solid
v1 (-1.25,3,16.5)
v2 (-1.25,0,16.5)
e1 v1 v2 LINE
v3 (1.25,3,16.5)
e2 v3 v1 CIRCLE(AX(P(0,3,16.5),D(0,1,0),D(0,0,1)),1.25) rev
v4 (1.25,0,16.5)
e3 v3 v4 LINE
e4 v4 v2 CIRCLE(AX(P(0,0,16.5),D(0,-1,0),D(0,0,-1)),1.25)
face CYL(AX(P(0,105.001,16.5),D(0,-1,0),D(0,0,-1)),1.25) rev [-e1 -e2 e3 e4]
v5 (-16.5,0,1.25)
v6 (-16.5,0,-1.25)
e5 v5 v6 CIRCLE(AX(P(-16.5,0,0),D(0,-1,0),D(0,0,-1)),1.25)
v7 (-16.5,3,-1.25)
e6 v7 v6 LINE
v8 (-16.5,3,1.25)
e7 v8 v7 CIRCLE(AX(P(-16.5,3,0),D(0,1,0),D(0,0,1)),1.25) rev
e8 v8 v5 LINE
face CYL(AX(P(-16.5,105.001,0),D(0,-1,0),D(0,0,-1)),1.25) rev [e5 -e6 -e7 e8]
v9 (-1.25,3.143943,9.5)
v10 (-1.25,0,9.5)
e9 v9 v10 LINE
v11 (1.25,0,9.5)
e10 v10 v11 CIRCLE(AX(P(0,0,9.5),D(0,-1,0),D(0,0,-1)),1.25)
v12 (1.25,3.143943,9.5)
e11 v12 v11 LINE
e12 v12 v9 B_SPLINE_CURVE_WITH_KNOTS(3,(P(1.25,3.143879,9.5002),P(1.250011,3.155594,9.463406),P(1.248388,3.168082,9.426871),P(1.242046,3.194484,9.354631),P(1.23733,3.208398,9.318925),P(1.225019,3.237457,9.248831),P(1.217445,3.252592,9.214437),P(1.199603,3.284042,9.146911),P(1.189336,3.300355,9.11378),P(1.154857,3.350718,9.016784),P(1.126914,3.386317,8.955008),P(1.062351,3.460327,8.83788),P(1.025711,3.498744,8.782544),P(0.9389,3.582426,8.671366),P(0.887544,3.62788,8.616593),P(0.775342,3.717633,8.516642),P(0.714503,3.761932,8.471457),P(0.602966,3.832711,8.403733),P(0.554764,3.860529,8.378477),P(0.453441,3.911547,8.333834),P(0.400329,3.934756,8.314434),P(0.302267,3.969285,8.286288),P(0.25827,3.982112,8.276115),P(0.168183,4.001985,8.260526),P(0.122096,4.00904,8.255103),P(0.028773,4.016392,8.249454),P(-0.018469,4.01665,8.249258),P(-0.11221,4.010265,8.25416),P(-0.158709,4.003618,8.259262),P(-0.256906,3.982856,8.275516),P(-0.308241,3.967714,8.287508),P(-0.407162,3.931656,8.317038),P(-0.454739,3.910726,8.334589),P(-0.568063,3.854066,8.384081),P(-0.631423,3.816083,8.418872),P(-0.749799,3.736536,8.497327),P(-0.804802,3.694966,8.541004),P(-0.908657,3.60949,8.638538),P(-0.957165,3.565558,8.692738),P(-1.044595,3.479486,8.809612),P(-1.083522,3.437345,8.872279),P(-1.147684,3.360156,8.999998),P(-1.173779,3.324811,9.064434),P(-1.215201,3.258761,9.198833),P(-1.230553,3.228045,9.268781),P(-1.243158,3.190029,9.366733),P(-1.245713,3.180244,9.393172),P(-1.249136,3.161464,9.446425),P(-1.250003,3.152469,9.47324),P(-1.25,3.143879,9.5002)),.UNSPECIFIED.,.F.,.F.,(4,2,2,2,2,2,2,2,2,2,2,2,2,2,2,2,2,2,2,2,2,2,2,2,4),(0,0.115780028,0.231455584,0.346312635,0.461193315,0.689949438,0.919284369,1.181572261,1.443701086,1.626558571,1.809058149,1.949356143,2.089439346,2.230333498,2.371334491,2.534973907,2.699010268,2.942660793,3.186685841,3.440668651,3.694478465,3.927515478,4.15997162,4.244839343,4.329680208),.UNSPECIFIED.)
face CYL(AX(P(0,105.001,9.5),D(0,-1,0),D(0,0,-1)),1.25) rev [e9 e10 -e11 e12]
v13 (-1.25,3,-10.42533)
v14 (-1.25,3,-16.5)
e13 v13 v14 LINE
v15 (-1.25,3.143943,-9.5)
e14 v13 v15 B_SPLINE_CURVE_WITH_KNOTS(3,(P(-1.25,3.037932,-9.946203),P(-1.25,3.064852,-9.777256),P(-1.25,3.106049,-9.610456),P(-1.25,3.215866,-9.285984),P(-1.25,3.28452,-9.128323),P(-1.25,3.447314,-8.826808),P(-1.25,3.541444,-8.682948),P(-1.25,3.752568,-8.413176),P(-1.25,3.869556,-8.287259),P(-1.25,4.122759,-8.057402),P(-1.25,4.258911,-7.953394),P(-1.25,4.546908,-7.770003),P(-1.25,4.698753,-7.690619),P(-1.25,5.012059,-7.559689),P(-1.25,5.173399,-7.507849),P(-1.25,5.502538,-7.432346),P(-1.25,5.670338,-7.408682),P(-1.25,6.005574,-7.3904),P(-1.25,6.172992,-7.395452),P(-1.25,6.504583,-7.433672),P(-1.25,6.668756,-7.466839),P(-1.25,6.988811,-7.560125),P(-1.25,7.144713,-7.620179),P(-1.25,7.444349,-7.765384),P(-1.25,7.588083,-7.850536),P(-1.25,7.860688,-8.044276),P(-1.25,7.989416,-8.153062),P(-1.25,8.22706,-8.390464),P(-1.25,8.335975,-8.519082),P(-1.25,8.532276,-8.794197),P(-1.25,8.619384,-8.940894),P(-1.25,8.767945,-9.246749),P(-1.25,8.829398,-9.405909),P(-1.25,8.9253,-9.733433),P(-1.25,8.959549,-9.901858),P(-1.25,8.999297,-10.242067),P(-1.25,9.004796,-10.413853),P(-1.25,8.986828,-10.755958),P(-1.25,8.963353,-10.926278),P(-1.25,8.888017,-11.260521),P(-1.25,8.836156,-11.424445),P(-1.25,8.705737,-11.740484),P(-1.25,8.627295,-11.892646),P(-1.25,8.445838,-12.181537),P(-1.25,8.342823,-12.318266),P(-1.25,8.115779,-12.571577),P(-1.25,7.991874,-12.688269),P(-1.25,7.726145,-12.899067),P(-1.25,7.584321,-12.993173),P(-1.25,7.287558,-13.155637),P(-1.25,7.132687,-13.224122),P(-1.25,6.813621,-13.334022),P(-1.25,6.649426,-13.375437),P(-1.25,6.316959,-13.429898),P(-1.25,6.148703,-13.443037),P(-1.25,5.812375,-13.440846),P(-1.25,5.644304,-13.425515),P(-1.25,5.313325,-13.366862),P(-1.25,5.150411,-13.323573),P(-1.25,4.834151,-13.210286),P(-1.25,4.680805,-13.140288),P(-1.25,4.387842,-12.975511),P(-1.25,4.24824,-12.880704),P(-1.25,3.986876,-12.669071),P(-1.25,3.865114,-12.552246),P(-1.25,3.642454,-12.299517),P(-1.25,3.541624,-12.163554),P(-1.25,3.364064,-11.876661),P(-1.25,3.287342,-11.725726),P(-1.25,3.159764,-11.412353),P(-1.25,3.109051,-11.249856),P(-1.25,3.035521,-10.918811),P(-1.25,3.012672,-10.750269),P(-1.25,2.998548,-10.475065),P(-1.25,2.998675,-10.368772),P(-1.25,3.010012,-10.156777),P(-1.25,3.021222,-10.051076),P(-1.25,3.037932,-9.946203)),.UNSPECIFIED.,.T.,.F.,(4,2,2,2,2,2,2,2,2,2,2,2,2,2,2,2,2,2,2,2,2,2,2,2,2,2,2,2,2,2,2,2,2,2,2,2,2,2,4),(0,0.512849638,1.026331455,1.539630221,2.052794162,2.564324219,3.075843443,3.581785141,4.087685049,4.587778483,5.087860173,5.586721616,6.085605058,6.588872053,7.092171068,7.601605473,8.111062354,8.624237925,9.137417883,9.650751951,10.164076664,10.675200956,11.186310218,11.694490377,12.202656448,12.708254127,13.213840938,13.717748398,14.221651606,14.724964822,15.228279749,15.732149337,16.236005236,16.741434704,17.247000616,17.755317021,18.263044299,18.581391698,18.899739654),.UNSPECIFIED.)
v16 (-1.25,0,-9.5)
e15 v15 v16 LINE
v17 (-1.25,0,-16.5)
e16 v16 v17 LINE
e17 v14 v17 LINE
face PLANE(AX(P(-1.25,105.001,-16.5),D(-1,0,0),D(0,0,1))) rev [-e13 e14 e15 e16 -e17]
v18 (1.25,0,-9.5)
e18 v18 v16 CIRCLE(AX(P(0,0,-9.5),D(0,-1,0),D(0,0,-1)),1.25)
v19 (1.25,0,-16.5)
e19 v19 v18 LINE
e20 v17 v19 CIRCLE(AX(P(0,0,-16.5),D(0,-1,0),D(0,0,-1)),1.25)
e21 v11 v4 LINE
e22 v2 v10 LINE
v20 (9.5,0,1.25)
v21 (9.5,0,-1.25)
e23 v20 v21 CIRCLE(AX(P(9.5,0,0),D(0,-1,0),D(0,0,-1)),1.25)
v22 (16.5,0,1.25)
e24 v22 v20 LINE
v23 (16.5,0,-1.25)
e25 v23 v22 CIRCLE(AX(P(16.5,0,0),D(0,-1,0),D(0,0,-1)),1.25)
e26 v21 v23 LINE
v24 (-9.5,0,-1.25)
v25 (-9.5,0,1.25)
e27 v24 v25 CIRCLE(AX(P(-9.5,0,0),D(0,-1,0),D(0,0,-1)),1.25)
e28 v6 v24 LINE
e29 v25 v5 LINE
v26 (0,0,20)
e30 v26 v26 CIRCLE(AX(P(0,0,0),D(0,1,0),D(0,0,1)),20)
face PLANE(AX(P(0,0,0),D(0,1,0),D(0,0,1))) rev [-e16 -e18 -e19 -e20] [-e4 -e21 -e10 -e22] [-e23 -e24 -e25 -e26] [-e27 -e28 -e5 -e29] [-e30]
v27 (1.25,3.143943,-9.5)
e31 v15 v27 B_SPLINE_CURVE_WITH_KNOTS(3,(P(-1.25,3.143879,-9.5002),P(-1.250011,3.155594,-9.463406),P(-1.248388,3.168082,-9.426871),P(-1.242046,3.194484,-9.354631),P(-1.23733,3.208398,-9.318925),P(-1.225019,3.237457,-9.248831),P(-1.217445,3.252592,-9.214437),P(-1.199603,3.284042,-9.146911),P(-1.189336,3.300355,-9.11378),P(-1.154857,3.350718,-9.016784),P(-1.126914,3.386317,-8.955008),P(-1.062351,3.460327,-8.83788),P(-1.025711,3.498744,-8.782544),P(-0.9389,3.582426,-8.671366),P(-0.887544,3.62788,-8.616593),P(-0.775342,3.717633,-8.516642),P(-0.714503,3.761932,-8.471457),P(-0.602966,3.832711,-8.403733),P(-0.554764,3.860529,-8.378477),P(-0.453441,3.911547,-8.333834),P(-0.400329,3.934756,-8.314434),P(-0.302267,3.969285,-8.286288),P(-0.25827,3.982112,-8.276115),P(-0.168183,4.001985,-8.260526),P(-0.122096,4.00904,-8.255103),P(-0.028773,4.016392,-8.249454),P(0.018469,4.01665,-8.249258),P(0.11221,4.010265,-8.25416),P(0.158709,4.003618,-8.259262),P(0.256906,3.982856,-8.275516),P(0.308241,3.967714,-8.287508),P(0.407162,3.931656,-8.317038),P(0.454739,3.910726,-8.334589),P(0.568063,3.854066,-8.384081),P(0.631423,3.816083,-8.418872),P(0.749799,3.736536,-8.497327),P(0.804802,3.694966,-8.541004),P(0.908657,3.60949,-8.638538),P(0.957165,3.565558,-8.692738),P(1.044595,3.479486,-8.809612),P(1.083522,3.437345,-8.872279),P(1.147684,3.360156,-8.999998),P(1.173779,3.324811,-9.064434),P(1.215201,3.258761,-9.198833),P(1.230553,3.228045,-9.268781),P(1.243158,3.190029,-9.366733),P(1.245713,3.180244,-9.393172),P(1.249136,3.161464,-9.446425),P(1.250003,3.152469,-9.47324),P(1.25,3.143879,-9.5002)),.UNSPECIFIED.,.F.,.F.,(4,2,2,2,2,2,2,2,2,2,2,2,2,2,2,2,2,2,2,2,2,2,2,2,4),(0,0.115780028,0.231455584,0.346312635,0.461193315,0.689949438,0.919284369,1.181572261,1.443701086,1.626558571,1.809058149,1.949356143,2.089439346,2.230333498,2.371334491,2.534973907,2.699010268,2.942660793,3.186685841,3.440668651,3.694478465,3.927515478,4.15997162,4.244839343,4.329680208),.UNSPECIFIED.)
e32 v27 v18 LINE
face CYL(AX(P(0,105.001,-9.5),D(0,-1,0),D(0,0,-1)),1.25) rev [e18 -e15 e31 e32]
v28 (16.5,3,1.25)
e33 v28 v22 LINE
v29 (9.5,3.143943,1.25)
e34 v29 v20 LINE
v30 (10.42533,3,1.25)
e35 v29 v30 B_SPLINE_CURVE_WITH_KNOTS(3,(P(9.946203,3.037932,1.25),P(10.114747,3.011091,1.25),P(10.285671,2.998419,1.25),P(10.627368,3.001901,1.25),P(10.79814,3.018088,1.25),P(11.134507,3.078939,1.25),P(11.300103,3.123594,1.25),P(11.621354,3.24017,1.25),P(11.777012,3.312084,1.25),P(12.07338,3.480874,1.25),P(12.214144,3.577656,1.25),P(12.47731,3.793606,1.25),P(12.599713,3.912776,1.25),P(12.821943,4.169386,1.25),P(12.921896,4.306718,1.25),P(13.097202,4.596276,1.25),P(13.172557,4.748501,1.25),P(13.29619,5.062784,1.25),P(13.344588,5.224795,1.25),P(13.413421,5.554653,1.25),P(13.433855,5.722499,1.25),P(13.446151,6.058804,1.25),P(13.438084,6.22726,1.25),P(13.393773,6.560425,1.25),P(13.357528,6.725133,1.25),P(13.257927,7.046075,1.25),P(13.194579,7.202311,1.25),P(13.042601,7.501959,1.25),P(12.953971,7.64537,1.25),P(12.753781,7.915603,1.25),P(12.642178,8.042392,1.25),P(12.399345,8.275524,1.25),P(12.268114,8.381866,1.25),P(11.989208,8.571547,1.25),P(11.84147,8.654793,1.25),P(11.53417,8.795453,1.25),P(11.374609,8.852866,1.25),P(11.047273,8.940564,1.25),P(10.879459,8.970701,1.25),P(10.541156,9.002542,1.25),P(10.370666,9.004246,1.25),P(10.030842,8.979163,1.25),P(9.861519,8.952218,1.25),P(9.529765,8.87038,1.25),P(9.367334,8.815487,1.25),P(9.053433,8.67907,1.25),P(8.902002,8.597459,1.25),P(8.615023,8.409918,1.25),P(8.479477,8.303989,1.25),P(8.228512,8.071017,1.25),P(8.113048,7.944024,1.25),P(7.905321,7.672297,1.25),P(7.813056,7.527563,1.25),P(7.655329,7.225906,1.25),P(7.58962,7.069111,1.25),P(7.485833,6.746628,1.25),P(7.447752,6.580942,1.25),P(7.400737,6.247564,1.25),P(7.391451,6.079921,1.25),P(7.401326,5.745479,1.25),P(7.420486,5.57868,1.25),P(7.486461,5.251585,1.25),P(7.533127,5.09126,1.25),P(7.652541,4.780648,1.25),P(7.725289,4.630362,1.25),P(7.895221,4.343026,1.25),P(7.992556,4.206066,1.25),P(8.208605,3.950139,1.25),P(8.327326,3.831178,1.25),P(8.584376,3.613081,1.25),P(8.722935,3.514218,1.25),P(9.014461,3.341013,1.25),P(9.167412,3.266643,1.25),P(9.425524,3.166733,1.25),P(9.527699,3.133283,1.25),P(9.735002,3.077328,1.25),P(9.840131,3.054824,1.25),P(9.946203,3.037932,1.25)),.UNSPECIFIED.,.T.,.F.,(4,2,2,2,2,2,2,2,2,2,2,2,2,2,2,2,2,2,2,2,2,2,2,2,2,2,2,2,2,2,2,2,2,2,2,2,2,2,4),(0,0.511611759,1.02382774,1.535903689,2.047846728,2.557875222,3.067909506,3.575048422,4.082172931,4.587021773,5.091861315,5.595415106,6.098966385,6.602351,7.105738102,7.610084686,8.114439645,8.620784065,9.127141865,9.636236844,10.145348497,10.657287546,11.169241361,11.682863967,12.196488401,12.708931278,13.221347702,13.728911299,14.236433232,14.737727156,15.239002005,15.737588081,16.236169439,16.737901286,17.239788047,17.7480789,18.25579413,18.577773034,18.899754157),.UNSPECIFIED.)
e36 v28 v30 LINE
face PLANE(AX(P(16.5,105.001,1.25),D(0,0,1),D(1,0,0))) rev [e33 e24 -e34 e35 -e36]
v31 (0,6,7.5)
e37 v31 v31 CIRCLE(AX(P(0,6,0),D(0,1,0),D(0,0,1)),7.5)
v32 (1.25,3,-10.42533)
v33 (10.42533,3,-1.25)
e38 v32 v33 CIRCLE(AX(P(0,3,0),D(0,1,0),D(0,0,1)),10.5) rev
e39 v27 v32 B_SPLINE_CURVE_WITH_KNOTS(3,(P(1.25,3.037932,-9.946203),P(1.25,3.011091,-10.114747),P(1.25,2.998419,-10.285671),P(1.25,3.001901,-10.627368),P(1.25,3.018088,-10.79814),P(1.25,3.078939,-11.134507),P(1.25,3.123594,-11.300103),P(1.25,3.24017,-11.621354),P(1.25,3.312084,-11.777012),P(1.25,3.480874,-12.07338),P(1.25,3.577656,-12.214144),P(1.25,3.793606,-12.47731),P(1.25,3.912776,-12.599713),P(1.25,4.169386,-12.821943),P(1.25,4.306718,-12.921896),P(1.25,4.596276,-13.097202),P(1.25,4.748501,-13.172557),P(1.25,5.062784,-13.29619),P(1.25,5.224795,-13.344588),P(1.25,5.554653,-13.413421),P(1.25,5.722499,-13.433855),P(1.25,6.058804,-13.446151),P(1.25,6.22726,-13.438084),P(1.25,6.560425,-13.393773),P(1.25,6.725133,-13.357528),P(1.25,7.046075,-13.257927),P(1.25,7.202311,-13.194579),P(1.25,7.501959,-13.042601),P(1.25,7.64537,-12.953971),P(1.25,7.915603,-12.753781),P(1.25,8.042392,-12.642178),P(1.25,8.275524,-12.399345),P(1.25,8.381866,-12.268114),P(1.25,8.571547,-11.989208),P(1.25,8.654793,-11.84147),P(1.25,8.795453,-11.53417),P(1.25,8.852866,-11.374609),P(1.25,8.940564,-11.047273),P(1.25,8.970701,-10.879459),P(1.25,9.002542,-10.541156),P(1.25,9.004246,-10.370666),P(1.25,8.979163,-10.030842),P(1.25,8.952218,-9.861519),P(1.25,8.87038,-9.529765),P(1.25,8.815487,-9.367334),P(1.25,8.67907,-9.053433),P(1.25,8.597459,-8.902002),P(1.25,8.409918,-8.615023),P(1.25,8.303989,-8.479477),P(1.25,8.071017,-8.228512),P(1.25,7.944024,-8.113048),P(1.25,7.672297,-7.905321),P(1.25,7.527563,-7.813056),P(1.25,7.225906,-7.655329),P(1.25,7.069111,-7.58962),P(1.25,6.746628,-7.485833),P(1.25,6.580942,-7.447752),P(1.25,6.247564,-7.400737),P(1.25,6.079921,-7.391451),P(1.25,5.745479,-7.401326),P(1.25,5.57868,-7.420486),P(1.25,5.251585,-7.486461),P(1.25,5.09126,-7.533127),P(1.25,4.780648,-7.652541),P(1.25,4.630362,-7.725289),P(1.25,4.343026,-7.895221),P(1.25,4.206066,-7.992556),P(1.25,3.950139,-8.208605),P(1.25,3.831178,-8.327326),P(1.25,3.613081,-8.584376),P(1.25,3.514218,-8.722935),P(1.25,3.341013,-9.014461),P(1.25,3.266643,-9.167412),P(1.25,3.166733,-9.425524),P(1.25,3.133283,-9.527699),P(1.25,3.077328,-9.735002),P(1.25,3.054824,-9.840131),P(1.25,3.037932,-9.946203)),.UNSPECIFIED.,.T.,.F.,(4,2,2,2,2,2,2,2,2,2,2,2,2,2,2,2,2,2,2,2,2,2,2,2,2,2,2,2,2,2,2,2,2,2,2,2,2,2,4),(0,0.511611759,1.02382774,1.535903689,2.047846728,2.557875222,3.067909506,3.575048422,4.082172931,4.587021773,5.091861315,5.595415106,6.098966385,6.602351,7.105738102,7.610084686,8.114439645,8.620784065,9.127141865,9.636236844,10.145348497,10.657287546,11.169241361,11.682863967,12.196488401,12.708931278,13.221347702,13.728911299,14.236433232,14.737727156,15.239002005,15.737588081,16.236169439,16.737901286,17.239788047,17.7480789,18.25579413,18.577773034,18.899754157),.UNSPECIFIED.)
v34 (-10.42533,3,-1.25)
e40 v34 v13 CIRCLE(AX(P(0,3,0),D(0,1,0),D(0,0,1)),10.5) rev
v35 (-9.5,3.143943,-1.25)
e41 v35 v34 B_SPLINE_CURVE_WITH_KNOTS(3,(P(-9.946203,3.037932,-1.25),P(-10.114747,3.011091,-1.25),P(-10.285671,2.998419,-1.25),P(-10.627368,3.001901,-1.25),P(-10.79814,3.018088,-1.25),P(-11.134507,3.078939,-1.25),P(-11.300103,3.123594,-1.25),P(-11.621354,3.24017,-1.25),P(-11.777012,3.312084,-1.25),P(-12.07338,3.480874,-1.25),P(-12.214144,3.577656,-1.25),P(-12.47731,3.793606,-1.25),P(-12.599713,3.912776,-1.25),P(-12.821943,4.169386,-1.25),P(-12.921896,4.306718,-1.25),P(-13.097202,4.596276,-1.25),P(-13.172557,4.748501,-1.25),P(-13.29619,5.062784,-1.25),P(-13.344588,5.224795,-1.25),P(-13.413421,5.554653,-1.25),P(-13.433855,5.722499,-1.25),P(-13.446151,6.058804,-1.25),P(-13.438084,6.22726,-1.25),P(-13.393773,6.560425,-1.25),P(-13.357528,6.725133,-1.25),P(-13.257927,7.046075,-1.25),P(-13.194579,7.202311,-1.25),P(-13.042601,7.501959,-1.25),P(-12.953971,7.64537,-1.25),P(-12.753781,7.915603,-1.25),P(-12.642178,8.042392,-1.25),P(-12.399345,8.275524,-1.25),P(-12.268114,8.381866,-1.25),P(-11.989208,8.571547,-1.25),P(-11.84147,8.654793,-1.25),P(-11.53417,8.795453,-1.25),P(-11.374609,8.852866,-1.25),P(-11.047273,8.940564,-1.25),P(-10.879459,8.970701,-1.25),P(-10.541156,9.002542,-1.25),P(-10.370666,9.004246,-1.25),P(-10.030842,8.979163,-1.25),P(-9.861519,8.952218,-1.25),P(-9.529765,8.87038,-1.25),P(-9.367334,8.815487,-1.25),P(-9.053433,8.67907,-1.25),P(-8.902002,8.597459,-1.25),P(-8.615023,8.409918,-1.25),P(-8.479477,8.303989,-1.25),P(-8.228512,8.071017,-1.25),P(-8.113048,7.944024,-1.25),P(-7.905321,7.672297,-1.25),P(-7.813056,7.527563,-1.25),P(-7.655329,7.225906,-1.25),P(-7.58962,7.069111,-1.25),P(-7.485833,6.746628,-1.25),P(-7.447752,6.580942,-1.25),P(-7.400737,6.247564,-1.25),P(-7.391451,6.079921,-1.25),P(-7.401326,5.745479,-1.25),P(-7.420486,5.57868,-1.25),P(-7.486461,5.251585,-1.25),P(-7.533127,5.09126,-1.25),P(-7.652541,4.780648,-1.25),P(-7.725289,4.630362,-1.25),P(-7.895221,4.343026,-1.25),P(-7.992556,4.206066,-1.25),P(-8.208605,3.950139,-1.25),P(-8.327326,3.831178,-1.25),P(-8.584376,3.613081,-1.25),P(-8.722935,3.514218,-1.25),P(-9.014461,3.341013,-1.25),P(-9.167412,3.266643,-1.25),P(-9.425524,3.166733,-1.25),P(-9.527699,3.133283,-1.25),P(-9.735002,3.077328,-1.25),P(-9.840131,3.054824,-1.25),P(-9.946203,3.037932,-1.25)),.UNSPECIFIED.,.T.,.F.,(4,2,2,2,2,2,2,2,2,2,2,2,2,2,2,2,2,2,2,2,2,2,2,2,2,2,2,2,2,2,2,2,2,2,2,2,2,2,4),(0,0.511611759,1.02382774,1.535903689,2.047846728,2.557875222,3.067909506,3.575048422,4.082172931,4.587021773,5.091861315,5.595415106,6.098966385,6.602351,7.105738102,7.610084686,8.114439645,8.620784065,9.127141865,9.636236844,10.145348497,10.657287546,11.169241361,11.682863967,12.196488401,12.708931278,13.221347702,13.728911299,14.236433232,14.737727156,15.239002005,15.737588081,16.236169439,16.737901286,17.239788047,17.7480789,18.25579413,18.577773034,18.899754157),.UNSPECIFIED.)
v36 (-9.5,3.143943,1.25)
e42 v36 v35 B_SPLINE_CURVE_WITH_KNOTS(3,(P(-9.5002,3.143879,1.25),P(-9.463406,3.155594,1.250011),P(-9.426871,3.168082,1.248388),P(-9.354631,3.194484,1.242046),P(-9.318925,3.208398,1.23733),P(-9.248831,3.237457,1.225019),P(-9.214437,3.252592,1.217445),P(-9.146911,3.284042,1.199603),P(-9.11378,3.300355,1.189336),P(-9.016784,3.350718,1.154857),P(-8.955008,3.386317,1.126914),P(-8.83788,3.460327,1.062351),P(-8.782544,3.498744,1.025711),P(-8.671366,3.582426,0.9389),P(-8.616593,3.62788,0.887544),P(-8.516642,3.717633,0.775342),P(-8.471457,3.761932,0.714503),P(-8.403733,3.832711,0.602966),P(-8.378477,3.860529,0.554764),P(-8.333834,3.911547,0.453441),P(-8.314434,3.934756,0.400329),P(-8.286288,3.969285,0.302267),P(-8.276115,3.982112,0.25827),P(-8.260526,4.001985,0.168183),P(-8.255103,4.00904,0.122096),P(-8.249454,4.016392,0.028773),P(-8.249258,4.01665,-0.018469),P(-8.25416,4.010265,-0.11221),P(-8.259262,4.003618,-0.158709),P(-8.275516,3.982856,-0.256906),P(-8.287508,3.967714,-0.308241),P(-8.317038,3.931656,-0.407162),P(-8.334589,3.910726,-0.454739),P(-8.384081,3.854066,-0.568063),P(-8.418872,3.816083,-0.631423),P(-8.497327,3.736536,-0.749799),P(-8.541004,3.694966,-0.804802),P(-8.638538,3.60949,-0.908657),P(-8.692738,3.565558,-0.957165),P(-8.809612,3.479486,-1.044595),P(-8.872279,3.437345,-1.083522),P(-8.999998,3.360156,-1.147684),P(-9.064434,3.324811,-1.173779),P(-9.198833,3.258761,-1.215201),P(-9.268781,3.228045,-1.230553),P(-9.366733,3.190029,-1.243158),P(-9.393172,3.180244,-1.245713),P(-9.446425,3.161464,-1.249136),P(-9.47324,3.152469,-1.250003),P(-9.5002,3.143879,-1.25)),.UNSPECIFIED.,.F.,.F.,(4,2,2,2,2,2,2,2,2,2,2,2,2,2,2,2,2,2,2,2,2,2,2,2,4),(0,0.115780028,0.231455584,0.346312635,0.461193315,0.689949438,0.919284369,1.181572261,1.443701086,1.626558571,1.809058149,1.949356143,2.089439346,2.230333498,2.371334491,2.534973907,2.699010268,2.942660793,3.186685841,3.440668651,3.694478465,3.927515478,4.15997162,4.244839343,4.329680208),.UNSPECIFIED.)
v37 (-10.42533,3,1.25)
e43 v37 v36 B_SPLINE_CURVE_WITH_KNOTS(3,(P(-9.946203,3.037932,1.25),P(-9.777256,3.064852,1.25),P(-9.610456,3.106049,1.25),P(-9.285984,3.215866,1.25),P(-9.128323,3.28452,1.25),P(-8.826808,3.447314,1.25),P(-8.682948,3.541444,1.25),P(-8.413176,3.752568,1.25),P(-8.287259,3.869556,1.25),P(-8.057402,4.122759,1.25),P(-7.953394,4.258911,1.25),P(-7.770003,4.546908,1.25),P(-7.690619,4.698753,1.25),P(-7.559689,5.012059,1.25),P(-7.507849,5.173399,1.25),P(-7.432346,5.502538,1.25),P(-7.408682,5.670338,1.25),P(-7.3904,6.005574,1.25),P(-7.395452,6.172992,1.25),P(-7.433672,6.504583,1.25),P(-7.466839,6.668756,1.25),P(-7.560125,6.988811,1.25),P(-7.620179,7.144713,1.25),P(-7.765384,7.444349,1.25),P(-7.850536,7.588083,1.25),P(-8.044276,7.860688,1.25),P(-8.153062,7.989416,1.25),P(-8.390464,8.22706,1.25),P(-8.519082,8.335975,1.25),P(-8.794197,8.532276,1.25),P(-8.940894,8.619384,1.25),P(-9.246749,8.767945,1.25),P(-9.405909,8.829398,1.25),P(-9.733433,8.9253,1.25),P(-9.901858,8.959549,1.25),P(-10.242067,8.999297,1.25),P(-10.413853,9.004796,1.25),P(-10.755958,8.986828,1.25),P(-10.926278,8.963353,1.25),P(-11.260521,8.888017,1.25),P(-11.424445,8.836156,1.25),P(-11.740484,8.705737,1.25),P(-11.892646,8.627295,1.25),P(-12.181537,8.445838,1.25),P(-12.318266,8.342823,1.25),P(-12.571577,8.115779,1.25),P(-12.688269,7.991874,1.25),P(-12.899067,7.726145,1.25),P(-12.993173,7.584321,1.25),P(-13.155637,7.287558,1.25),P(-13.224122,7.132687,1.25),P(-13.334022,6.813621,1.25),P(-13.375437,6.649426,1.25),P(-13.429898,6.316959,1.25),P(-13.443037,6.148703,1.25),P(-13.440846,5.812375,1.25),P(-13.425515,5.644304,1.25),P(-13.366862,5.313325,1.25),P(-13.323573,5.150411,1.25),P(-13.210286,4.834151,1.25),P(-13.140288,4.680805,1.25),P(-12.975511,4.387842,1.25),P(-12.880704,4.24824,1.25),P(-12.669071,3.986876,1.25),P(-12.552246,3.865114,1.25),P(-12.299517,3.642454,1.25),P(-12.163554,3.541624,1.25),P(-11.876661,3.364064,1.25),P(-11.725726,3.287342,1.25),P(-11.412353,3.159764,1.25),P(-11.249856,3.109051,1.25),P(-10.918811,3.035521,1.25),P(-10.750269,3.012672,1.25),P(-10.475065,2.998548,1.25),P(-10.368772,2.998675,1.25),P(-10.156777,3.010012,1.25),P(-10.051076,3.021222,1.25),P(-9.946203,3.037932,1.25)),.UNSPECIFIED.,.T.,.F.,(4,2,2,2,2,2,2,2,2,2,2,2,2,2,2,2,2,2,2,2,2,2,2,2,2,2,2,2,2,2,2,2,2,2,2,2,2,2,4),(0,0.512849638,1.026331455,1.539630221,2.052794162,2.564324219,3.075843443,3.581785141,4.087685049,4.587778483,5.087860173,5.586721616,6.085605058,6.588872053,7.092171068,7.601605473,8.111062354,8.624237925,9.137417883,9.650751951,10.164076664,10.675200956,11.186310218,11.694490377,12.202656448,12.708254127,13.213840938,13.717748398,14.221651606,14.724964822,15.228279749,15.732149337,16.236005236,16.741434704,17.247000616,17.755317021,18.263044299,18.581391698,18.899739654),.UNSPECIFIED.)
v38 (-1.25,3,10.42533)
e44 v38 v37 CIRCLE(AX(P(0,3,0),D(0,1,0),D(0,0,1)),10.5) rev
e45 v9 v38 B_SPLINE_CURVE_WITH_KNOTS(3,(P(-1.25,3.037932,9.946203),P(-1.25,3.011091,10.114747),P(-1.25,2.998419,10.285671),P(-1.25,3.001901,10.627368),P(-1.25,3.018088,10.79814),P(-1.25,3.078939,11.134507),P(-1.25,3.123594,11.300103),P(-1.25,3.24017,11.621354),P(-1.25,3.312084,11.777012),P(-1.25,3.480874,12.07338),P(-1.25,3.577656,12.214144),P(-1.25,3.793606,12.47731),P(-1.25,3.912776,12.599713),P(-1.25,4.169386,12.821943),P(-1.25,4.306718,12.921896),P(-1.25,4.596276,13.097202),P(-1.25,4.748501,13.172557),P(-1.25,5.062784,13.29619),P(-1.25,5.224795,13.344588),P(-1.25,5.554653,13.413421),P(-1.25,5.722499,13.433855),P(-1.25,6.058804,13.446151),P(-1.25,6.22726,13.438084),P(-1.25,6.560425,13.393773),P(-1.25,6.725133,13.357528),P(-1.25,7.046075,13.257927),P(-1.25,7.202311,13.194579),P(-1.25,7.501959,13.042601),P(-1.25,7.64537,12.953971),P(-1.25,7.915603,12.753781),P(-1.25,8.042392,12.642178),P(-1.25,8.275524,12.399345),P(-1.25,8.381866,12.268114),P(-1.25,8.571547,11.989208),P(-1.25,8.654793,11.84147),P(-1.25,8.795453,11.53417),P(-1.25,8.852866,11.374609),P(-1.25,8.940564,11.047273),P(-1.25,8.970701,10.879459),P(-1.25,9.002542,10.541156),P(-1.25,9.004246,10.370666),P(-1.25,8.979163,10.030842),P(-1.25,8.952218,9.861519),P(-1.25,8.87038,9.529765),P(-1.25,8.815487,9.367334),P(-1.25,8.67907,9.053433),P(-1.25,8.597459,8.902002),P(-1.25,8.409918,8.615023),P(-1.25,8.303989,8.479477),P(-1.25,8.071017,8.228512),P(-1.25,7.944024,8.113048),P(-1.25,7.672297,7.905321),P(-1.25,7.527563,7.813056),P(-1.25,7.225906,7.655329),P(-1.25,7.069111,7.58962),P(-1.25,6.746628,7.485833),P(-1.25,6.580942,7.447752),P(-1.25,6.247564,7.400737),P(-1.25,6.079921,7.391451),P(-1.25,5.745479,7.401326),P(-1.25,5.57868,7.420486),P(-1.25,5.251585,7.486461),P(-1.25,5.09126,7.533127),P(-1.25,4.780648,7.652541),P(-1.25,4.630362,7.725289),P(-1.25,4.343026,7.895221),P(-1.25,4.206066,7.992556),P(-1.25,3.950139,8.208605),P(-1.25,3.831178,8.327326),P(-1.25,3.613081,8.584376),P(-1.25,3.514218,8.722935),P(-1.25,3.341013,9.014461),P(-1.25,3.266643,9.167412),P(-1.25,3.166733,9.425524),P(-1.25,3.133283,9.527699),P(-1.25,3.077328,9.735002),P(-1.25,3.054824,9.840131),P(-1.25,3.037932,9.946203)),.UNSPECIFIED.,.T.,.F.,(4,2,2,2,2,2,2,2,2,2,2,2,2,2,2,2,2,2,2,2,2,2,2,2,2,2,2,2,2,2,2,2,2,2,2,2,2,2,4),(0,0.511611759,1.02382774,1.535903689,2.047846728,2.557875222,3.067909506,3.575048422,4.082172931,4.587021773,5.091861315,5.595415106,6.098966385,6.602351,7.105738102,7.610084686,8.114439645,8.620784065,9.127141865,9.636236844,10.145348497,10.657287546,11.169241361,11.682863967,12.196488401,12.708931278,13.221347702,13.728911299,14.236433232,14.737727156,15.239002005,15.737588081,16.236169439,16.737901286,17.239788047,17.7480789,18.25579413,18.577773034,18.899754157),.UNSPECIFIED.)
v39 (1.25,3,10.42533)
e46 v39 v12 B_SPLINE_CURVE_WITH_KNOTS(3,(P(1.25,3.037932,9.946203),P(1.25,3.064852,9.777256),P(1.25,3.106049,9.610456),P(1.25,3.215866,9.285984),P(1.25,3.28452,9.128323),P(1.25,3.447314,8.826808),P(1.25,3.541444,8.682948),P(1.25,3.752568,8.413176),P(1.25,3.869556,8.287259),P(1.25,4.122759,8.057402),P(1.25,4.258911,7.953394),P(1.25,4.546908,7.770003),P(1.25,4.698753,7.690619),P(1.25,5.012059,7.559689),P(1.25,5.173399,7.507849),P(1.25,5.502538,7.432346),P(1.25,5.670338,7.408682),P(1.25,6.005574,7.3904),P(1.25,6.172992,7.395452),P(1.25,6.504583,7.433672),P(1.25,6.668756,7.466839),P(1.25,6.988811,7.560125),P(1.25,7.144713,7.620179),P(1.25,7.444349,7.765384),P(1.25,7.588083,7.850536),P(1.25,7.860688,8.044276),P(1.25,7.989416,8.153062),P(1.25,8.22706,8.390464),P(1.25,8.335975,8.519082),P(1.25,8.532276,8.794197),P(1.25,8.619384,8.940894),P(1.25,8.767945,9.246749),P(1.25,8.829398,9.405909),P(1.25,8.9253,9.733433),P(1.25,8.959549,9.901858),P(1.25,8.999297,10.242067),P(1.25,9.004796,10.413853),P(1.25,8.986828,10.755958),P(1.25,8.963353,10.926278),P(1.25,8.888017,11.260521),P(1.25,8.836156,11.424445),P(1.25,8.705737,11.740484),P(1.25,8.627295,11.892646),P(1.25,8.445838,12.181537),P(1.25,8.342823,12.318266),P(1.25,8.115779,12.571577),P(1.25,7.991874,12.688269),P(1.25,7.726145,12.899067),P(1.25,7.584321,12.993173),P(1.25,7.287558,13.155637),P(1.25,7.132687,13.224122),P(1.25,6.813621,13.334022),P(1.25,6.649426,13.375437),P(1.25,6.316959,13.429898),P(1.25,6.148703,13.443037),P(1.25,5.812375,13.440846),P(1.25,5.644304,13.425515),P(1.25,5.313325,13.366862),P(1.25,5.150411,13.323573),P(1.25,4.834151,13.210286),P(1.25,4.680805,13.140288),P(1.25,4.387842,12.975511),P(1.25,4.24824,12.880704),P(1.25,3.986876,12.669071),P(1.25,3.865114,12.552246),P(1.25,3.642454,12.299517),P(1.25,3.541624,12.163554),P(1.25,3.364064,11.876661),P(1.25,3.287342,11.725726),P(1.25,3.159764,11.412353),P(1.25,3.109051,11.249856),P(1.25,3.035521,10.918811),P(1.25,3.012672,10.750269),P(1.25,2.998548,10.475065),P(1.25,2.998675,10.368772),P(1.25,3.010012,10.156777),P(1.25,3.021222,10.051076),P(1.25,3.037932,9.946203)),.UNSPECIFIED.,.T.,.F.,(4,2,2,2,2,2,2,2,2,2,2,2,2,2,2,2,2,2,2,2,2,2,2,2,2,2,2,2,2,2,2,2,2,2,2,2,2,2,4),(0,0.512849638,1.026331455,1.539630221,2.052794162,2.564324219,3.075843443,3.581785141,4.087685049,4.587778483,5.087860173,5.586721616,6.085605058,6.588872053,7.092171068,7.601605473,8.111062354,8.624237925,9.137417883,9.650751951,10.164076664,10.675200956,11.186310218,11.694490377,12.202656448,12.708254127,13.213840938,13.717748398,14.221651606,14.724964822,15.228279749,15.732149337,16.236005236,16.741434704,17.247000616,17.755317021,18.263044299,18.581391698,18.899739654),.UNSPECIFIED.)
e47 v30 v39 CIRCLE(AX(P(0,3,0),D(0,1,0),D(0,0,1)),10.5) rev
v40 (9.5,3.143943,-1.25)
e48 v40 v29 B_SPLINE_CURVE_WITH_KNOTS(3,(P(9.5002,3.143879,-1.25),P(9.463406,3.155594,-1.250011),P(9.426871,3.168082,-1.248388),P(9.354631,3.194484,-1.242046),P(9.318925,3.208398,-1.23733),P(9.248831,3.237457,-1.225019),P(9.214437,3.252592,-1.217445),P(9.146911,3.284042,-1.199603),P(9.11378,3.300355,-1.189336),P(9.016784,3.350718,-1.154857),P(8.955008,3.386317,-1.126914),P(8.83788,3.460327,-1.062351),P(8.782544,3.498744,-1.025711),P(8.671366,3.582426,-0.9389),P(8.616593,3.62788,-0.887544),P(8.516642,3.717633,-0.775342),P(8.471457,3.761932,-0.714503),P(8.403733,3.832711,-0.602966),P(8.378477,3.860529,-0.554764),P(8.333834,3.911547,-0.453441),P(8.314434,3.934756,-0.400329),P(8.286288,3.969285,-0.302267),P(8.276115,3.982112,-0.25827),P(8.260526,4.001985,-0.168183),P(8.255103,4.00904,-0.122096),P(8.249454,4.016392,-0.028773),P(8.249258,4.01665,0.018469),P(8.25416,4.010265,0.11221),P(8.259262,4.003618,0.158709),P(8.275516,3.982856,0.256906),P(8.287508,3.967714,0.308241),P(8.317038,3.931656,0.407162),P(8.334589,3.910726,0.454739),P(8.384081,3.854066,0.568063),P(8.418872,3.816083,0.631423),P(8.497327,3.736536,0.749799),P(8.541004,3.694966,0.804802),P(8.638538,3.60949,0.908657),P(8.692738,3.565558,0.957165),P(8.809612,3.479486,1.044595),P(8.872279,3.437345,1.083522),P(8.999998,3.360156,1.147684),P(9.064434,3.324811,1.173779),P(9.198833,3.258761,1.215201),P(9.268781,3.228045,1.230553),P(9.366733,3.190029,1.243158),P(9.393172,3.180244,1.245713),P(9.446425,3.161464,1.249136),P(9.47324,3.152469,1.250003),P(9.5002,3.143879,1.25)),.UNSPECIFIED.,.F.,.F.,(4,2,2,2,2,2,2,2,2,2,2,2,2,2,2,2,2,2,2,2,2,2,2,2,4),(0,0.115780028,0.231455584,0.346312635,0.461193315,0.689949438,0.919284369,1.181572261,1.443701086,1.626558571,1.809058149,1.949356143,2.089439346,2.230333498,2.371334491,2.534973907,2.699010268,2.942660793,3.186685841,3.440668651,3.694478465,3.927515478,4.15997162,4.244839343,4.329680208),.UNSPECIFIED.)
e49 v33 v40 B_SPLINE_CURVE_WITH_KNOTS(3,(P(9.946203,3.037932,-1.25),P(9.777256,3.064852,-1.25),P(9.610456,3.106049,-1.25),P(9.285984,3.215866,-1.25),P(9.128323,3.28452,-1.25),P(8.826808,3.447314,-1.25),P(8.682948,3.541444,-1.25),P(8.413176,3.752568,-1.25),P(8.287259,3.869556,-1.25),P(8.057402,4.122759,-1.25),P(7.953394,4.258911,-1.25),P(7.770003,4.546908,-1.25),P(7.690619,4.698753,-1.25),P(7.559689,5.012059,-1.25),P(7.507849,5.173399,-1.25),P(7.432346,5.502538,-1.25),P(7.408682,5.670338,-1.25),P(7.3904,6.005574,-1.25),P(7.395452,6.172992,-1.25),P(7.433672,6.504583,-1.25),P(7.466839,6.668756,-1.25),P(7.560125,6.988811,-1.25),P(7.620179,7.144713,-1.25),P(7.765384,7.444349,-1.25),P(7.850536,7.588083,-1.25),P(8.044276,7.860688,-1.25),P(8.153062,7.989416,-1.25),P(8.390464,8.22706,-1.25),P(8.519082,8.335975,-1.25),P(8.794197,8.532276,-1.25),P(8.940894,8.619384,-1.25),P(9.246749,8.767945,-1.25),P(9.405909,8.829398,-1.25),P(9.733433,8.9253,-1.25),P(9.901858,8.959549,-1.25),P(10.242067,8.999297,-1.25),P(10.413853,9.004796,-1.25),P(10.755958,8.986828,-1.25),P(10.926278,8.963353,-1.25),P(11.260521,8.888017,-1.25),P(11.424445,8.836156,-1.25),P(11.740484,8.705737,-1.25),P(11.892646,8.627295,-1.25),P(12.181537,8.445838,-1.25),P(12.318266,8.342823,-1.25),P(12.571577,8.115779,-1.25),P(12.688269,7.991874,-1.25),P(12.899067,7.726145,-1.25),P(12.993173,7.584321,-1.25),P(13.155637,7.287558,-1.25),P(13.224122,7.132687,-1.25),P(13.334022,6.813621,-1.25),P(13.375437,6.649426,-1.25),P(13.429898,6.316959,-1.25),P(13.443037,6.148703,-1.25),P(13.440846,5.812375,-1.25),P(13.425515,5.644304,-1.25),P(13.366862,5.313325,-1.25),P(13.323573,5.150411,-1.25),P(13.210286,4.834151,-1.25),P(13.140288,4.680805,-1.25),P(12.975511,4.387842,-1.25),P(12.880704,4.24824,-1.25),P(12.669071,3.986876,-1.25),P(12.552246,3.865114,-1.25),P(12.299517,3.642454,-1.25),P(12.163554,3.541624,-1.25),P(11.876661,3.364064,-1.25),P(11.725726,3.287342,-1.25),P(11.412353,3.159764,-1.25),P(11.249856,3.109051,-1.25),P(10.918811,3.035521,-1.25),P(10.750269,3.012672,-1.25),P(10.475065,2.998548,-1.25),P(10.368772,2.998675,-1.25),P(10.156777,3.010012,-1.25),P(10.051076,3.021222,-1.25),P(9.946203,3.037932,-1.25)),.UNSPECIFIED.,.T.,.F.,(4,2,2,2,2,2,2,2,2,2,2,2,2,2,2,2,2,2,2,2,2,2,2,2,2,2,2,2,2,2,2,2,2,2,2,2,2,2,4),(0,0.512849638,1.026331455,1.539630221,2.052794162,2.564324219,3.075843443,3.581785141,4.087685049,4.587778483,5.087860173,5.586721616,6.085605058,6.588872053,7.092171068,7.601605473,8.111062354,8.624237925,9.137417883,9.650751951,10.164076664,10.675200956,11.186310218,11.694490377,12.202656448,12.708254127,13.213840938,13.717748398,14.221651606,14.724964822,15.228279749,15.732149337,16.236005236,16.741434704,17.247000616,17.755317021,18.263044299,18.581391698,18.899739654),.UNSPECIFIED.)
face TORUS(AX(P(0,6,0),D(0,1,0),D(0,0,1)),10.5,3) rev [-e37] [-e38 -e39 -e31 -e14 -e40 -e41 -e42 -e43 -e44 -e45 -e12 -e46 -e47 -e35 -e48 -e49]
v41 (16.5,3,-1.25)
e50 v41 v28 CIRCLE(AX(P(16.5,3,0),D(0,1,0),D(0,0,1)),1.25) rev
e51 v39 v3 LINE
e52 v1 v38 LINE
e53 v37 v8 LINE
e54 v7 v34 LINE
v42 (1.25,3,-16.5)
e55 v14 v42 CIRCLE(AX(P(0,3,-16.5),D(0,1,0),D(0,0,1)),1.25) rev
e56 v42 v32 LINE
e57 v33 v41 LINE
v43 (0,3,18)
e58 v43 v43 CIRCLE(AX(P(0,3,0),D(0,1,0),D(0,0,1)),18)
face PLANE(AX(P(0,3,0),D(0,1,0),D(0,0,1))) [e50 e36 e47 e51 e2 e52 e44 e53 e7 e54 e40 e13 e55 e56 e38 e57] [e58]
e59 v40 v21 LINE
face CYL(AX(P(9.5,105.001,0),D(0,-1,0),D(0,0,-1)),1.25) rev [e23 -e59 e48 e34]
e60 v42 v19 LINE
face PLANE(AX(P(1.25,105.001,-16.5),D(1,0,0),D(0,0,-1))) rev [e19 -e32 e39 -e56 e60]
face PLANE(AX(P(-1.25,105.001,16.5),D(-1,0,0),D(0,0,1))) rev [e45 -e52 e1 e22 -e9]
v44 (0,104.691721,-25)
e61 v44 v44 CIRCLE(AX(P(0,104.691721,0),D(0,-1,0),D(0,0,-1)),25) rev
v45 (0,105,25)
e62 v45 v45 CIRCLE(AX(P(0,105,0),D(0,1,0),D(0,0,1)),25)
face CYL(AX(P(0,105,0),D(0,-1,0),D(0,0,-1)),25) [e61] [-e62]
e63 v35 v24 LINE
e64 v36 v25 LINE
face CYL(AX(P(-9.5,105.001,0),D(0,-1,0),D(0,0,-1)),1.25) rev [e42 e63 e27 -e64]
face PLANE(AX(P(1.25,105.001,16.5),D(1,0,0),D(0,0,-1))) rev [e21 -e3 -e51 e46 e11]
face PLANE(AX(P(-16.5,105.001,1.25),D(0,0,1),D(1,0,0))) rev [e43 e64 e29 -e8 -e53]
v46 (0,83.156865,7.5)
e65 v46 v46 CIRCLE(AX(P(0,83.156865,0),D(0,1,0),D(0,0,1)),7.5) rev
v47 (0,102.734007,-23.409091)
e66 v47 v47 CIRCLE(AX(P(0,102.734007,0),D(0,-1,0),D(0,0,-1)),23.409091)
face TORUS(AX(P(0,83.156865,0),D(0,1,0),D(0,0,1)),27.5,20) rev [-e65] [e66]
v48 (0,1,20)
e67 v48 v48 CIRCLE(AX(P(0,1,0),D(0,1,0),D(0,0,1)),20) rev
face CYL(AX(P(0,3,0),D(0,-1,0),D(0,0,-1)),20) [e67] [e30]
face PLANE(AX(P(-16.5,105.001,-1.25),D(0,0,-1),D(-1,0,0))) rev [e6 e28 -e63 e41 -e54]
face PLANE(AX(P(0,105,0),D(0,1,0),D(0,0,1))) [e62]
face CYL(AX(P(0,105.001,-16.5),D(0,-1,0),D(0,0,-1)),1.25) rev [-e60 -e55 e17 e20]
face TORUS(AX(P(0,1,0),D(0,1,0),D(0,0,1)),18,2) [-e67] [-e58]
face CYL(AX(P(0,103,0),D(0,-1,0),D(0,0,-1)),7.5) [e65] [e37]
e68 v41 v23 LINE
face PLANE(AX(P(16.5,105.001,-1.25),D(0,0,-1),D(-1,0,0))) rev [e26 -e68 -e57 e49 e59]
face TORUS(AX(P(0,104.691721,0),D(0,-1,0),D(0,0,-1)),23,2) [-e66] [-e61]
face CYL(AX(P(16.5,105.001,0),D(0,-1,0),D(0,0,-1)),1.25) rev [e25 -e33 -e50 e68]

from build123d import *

# Parameters (mm, degrees)
SKETCH1_R           = 20
BOSS_EXTRUDE1_DEPTH = 3
SKETCH2_R           = 7.5
BOSS_EXTRUDE2_DEPTH = 100
SKETCH3_R           = 25
BOSS_EXTRUDE3_DEPTH = 2
FILLET3_R           = 20
FILLET4_R           = 2
FILLET6_R           = 3
CUT_EXTRUDE1_REACH  = 112.793
FILLET8_R           = 2


with BuildPart() as part:
    # Sketch1 → Boss-Extrude1 (new body)
    with BuildSketch(Plane(origin=(0, 0, 0), x_dir=(1, 0, 0), z_dir=(0, 1, 0))):
        with Locations(Location((0, 0, 0), (0, 0, 270))):
            Circle(SKETCH1_R)
    extrude(amount=BOSS_EXTRUDE1_DEPTH)

    # Sketch2 → Boss-Extrude2 (add)
    with BuildSketch(Plane(origin=(0, 3, 0), x_dir=(1, 0, 0), z_dir=(0, 1, 0))):
        with Locations(Location((0, 0, 0), (0, 0, 270))):
            Circle(SKETCH2_R)
    extrude(amount=BOSS_EXTRUDE2_DEPTH)

    # Sketch3 → Boss-Extrude3 (add)
    with BuildSketch(Plane(origin=(0, 103, 0), x_dir=(1, 0, 0), z_dir=(0, 1, 0))):
        with Locations(Location((0, 0, 0), (0, 0, 270))):
            Circle(SKETCH3_R)
    extrude(amount=BOSS_EXTRUDE3_DEPTH)

    # Fillet3
    # the kernel refuses this fillet: 20 mm, written as the material it adds along each edge
    with BuildSketch(Plane(origin=(0, 103, 0), x_dir=(0, 0, 1), z_dir=(-1, 0, 0))) as fillet3_piece_1:
        with BuildLine():
            CenterArc((27.5, -19.843134833), FILLET3_R, 97.180755781, 82.819244219)
            Line((7.5, -19.843134833), (7.1, -19.843134833))
            Line((7.1, -19.843134833), (7.1, 0))
            Line((7.1, 0), (7.5, 0.4))
            ThreePointArc((7.5, 0.4), (16.25, 0.4), (24.95, 0.396862697))
            Line((24.95, 0.396862697), (25, 0))
        make_face()
    revolve(axis=Axis((0, 103, 0), (0, 1, 0)))

    # Fillet4
    fillet4_edges = [part.edges().sort_by_distance(p)[0] for p in [
        (0, 103, -25),
    ]]
    fillet(fillet4_edges, radius=FILLET4_R)

    # Fillet6
    fillet6_edges = [part.edges().sort_by_distance(p)[0] for p in [
        (0, 3, -7.5),
    ]]
    fillet(fillet6_edges, radius=FILLET6_R)

    # Sketch4 → Cut-Extrude1 (cut, up to next)
    with BuildSketch(Plane.XZ, mode=Mode.PRIVATE) as cut_extrude1_sk1:
        with BuildLine():
            Line((-1.25, -16.5), (-1.25, -9.5))
            ThreePointArc((-1.25, -9.5), (0, -8.25), (1.25, -9.5))
            Line((1.25, -9.5), (1.25, -16.5))
            ThreePointArc((1.25, -16.5), (0, -17.75), (-1.25, -16.5))
        make_face()
    cut_extrude1_tool1 = extrude(cut_extrude1_sk1.sketch, amount=-CUT_EXTRUDE1_REACH, mode=Mode.PRIVATE) & part.part
    # Sketch4 → Cut-Extrude1 (cut, up to next)
    with BuildSketch(Plane.XZ, mode=Mode.PRIVATE) as cut_extrude1_sk2:
        with BuildLine():
            Line((-16.5, 1.25), (-9.5, 1.25))
            ThreePointArc((-9.5, 1.25), (-8.25, 0), (-9.5, -1.25))
            Line((-9.5, -1.25), (-16.5, -1.25))
            ThreePointArc((-16.5, -1.25), (-17.75, 0), (-16.5, 1.25))
        make_face()
    cut_extrude1_tool2 = extrude(cut_extrude1_sk2.sketch, amount=-CUT_EXTRUDE1_REACH, mode=Mode.PRIVATE) & part.part
    # Sketch4 → Cut-Extrude1 (cut, up to next)
    with BuildSketch(Plane.XZ, mode=Mode.PRIVATE) as cut_extrude1_sk3:
        with BuildLine():
            Line((1.25, 16.5), (1.25, 9.5))
            ThreePointArc((1.25, 9.5), (0, 8.25), (-1.25, 9.5))
            Line((-1.25, 9.5), (-1.25, 16.5))
            ThreePointArc((-1.25, 16.5), (0, 17.75), (1.25, 16.5))
        make_face()
    cut_extrude1_tool3 = extrude(cut_extrude1_sk3.sketch, amount=-CUT_EXTRUDE1_REACH, mode=Mode.PRIVATE) & part.part
    # Sketch4 → Cut-Extrude1 (cut, up to next)
    with BuildSketch(Plane.XZ, mode=Mode.PRIVATE) as cut_extrude1_sk4:
        with BuildLine():
            Line((16.5, -1.25), (9.5, -1.25))
            ThreePointArc((9.5, -1.25), (8.25, 0), (9.5, 1.25))
            Line((9.5, 1.25), (16.5, 1.25))
            ThreePointArc((16.5, 1.25), (17.75, 0), (16.5, -1.25))
        make_face()
    cut_extrude1_tool4 = extrude(cut_extrude1_sk4.sketch, amount=-CUT_EXTRUDE1_REACH, mode=Mode.PRIVATE) & part.part
    add(cut_extrude1_tool1.solids().sort_by_distance((0, 0, -13))[0], mode=Mode.SUBTRACT)
    add(cut_extrude1_tool2.solids().sort_by_distance((-13, 0, 0))[0], mode=Mode.SUBTRACT)
    add(cut_extrude1_tool3.solids().sort_by_distance((0, 0, 13))[0], mode=Mode.SUBTRACT)
    add(cut_extrude1_tool4.solids().sort_by_distance((13, 0, 0))[0], mode=Mode.SUBTRACT)

    # Fillet8
    fillet8_edges = [part.edges().sort_by_distance(p)[0] for p in [
        (0, 3, -20),
    ]]
    fillet(fillet8_edges, radius=FILLET8_R)


solid = part.part
